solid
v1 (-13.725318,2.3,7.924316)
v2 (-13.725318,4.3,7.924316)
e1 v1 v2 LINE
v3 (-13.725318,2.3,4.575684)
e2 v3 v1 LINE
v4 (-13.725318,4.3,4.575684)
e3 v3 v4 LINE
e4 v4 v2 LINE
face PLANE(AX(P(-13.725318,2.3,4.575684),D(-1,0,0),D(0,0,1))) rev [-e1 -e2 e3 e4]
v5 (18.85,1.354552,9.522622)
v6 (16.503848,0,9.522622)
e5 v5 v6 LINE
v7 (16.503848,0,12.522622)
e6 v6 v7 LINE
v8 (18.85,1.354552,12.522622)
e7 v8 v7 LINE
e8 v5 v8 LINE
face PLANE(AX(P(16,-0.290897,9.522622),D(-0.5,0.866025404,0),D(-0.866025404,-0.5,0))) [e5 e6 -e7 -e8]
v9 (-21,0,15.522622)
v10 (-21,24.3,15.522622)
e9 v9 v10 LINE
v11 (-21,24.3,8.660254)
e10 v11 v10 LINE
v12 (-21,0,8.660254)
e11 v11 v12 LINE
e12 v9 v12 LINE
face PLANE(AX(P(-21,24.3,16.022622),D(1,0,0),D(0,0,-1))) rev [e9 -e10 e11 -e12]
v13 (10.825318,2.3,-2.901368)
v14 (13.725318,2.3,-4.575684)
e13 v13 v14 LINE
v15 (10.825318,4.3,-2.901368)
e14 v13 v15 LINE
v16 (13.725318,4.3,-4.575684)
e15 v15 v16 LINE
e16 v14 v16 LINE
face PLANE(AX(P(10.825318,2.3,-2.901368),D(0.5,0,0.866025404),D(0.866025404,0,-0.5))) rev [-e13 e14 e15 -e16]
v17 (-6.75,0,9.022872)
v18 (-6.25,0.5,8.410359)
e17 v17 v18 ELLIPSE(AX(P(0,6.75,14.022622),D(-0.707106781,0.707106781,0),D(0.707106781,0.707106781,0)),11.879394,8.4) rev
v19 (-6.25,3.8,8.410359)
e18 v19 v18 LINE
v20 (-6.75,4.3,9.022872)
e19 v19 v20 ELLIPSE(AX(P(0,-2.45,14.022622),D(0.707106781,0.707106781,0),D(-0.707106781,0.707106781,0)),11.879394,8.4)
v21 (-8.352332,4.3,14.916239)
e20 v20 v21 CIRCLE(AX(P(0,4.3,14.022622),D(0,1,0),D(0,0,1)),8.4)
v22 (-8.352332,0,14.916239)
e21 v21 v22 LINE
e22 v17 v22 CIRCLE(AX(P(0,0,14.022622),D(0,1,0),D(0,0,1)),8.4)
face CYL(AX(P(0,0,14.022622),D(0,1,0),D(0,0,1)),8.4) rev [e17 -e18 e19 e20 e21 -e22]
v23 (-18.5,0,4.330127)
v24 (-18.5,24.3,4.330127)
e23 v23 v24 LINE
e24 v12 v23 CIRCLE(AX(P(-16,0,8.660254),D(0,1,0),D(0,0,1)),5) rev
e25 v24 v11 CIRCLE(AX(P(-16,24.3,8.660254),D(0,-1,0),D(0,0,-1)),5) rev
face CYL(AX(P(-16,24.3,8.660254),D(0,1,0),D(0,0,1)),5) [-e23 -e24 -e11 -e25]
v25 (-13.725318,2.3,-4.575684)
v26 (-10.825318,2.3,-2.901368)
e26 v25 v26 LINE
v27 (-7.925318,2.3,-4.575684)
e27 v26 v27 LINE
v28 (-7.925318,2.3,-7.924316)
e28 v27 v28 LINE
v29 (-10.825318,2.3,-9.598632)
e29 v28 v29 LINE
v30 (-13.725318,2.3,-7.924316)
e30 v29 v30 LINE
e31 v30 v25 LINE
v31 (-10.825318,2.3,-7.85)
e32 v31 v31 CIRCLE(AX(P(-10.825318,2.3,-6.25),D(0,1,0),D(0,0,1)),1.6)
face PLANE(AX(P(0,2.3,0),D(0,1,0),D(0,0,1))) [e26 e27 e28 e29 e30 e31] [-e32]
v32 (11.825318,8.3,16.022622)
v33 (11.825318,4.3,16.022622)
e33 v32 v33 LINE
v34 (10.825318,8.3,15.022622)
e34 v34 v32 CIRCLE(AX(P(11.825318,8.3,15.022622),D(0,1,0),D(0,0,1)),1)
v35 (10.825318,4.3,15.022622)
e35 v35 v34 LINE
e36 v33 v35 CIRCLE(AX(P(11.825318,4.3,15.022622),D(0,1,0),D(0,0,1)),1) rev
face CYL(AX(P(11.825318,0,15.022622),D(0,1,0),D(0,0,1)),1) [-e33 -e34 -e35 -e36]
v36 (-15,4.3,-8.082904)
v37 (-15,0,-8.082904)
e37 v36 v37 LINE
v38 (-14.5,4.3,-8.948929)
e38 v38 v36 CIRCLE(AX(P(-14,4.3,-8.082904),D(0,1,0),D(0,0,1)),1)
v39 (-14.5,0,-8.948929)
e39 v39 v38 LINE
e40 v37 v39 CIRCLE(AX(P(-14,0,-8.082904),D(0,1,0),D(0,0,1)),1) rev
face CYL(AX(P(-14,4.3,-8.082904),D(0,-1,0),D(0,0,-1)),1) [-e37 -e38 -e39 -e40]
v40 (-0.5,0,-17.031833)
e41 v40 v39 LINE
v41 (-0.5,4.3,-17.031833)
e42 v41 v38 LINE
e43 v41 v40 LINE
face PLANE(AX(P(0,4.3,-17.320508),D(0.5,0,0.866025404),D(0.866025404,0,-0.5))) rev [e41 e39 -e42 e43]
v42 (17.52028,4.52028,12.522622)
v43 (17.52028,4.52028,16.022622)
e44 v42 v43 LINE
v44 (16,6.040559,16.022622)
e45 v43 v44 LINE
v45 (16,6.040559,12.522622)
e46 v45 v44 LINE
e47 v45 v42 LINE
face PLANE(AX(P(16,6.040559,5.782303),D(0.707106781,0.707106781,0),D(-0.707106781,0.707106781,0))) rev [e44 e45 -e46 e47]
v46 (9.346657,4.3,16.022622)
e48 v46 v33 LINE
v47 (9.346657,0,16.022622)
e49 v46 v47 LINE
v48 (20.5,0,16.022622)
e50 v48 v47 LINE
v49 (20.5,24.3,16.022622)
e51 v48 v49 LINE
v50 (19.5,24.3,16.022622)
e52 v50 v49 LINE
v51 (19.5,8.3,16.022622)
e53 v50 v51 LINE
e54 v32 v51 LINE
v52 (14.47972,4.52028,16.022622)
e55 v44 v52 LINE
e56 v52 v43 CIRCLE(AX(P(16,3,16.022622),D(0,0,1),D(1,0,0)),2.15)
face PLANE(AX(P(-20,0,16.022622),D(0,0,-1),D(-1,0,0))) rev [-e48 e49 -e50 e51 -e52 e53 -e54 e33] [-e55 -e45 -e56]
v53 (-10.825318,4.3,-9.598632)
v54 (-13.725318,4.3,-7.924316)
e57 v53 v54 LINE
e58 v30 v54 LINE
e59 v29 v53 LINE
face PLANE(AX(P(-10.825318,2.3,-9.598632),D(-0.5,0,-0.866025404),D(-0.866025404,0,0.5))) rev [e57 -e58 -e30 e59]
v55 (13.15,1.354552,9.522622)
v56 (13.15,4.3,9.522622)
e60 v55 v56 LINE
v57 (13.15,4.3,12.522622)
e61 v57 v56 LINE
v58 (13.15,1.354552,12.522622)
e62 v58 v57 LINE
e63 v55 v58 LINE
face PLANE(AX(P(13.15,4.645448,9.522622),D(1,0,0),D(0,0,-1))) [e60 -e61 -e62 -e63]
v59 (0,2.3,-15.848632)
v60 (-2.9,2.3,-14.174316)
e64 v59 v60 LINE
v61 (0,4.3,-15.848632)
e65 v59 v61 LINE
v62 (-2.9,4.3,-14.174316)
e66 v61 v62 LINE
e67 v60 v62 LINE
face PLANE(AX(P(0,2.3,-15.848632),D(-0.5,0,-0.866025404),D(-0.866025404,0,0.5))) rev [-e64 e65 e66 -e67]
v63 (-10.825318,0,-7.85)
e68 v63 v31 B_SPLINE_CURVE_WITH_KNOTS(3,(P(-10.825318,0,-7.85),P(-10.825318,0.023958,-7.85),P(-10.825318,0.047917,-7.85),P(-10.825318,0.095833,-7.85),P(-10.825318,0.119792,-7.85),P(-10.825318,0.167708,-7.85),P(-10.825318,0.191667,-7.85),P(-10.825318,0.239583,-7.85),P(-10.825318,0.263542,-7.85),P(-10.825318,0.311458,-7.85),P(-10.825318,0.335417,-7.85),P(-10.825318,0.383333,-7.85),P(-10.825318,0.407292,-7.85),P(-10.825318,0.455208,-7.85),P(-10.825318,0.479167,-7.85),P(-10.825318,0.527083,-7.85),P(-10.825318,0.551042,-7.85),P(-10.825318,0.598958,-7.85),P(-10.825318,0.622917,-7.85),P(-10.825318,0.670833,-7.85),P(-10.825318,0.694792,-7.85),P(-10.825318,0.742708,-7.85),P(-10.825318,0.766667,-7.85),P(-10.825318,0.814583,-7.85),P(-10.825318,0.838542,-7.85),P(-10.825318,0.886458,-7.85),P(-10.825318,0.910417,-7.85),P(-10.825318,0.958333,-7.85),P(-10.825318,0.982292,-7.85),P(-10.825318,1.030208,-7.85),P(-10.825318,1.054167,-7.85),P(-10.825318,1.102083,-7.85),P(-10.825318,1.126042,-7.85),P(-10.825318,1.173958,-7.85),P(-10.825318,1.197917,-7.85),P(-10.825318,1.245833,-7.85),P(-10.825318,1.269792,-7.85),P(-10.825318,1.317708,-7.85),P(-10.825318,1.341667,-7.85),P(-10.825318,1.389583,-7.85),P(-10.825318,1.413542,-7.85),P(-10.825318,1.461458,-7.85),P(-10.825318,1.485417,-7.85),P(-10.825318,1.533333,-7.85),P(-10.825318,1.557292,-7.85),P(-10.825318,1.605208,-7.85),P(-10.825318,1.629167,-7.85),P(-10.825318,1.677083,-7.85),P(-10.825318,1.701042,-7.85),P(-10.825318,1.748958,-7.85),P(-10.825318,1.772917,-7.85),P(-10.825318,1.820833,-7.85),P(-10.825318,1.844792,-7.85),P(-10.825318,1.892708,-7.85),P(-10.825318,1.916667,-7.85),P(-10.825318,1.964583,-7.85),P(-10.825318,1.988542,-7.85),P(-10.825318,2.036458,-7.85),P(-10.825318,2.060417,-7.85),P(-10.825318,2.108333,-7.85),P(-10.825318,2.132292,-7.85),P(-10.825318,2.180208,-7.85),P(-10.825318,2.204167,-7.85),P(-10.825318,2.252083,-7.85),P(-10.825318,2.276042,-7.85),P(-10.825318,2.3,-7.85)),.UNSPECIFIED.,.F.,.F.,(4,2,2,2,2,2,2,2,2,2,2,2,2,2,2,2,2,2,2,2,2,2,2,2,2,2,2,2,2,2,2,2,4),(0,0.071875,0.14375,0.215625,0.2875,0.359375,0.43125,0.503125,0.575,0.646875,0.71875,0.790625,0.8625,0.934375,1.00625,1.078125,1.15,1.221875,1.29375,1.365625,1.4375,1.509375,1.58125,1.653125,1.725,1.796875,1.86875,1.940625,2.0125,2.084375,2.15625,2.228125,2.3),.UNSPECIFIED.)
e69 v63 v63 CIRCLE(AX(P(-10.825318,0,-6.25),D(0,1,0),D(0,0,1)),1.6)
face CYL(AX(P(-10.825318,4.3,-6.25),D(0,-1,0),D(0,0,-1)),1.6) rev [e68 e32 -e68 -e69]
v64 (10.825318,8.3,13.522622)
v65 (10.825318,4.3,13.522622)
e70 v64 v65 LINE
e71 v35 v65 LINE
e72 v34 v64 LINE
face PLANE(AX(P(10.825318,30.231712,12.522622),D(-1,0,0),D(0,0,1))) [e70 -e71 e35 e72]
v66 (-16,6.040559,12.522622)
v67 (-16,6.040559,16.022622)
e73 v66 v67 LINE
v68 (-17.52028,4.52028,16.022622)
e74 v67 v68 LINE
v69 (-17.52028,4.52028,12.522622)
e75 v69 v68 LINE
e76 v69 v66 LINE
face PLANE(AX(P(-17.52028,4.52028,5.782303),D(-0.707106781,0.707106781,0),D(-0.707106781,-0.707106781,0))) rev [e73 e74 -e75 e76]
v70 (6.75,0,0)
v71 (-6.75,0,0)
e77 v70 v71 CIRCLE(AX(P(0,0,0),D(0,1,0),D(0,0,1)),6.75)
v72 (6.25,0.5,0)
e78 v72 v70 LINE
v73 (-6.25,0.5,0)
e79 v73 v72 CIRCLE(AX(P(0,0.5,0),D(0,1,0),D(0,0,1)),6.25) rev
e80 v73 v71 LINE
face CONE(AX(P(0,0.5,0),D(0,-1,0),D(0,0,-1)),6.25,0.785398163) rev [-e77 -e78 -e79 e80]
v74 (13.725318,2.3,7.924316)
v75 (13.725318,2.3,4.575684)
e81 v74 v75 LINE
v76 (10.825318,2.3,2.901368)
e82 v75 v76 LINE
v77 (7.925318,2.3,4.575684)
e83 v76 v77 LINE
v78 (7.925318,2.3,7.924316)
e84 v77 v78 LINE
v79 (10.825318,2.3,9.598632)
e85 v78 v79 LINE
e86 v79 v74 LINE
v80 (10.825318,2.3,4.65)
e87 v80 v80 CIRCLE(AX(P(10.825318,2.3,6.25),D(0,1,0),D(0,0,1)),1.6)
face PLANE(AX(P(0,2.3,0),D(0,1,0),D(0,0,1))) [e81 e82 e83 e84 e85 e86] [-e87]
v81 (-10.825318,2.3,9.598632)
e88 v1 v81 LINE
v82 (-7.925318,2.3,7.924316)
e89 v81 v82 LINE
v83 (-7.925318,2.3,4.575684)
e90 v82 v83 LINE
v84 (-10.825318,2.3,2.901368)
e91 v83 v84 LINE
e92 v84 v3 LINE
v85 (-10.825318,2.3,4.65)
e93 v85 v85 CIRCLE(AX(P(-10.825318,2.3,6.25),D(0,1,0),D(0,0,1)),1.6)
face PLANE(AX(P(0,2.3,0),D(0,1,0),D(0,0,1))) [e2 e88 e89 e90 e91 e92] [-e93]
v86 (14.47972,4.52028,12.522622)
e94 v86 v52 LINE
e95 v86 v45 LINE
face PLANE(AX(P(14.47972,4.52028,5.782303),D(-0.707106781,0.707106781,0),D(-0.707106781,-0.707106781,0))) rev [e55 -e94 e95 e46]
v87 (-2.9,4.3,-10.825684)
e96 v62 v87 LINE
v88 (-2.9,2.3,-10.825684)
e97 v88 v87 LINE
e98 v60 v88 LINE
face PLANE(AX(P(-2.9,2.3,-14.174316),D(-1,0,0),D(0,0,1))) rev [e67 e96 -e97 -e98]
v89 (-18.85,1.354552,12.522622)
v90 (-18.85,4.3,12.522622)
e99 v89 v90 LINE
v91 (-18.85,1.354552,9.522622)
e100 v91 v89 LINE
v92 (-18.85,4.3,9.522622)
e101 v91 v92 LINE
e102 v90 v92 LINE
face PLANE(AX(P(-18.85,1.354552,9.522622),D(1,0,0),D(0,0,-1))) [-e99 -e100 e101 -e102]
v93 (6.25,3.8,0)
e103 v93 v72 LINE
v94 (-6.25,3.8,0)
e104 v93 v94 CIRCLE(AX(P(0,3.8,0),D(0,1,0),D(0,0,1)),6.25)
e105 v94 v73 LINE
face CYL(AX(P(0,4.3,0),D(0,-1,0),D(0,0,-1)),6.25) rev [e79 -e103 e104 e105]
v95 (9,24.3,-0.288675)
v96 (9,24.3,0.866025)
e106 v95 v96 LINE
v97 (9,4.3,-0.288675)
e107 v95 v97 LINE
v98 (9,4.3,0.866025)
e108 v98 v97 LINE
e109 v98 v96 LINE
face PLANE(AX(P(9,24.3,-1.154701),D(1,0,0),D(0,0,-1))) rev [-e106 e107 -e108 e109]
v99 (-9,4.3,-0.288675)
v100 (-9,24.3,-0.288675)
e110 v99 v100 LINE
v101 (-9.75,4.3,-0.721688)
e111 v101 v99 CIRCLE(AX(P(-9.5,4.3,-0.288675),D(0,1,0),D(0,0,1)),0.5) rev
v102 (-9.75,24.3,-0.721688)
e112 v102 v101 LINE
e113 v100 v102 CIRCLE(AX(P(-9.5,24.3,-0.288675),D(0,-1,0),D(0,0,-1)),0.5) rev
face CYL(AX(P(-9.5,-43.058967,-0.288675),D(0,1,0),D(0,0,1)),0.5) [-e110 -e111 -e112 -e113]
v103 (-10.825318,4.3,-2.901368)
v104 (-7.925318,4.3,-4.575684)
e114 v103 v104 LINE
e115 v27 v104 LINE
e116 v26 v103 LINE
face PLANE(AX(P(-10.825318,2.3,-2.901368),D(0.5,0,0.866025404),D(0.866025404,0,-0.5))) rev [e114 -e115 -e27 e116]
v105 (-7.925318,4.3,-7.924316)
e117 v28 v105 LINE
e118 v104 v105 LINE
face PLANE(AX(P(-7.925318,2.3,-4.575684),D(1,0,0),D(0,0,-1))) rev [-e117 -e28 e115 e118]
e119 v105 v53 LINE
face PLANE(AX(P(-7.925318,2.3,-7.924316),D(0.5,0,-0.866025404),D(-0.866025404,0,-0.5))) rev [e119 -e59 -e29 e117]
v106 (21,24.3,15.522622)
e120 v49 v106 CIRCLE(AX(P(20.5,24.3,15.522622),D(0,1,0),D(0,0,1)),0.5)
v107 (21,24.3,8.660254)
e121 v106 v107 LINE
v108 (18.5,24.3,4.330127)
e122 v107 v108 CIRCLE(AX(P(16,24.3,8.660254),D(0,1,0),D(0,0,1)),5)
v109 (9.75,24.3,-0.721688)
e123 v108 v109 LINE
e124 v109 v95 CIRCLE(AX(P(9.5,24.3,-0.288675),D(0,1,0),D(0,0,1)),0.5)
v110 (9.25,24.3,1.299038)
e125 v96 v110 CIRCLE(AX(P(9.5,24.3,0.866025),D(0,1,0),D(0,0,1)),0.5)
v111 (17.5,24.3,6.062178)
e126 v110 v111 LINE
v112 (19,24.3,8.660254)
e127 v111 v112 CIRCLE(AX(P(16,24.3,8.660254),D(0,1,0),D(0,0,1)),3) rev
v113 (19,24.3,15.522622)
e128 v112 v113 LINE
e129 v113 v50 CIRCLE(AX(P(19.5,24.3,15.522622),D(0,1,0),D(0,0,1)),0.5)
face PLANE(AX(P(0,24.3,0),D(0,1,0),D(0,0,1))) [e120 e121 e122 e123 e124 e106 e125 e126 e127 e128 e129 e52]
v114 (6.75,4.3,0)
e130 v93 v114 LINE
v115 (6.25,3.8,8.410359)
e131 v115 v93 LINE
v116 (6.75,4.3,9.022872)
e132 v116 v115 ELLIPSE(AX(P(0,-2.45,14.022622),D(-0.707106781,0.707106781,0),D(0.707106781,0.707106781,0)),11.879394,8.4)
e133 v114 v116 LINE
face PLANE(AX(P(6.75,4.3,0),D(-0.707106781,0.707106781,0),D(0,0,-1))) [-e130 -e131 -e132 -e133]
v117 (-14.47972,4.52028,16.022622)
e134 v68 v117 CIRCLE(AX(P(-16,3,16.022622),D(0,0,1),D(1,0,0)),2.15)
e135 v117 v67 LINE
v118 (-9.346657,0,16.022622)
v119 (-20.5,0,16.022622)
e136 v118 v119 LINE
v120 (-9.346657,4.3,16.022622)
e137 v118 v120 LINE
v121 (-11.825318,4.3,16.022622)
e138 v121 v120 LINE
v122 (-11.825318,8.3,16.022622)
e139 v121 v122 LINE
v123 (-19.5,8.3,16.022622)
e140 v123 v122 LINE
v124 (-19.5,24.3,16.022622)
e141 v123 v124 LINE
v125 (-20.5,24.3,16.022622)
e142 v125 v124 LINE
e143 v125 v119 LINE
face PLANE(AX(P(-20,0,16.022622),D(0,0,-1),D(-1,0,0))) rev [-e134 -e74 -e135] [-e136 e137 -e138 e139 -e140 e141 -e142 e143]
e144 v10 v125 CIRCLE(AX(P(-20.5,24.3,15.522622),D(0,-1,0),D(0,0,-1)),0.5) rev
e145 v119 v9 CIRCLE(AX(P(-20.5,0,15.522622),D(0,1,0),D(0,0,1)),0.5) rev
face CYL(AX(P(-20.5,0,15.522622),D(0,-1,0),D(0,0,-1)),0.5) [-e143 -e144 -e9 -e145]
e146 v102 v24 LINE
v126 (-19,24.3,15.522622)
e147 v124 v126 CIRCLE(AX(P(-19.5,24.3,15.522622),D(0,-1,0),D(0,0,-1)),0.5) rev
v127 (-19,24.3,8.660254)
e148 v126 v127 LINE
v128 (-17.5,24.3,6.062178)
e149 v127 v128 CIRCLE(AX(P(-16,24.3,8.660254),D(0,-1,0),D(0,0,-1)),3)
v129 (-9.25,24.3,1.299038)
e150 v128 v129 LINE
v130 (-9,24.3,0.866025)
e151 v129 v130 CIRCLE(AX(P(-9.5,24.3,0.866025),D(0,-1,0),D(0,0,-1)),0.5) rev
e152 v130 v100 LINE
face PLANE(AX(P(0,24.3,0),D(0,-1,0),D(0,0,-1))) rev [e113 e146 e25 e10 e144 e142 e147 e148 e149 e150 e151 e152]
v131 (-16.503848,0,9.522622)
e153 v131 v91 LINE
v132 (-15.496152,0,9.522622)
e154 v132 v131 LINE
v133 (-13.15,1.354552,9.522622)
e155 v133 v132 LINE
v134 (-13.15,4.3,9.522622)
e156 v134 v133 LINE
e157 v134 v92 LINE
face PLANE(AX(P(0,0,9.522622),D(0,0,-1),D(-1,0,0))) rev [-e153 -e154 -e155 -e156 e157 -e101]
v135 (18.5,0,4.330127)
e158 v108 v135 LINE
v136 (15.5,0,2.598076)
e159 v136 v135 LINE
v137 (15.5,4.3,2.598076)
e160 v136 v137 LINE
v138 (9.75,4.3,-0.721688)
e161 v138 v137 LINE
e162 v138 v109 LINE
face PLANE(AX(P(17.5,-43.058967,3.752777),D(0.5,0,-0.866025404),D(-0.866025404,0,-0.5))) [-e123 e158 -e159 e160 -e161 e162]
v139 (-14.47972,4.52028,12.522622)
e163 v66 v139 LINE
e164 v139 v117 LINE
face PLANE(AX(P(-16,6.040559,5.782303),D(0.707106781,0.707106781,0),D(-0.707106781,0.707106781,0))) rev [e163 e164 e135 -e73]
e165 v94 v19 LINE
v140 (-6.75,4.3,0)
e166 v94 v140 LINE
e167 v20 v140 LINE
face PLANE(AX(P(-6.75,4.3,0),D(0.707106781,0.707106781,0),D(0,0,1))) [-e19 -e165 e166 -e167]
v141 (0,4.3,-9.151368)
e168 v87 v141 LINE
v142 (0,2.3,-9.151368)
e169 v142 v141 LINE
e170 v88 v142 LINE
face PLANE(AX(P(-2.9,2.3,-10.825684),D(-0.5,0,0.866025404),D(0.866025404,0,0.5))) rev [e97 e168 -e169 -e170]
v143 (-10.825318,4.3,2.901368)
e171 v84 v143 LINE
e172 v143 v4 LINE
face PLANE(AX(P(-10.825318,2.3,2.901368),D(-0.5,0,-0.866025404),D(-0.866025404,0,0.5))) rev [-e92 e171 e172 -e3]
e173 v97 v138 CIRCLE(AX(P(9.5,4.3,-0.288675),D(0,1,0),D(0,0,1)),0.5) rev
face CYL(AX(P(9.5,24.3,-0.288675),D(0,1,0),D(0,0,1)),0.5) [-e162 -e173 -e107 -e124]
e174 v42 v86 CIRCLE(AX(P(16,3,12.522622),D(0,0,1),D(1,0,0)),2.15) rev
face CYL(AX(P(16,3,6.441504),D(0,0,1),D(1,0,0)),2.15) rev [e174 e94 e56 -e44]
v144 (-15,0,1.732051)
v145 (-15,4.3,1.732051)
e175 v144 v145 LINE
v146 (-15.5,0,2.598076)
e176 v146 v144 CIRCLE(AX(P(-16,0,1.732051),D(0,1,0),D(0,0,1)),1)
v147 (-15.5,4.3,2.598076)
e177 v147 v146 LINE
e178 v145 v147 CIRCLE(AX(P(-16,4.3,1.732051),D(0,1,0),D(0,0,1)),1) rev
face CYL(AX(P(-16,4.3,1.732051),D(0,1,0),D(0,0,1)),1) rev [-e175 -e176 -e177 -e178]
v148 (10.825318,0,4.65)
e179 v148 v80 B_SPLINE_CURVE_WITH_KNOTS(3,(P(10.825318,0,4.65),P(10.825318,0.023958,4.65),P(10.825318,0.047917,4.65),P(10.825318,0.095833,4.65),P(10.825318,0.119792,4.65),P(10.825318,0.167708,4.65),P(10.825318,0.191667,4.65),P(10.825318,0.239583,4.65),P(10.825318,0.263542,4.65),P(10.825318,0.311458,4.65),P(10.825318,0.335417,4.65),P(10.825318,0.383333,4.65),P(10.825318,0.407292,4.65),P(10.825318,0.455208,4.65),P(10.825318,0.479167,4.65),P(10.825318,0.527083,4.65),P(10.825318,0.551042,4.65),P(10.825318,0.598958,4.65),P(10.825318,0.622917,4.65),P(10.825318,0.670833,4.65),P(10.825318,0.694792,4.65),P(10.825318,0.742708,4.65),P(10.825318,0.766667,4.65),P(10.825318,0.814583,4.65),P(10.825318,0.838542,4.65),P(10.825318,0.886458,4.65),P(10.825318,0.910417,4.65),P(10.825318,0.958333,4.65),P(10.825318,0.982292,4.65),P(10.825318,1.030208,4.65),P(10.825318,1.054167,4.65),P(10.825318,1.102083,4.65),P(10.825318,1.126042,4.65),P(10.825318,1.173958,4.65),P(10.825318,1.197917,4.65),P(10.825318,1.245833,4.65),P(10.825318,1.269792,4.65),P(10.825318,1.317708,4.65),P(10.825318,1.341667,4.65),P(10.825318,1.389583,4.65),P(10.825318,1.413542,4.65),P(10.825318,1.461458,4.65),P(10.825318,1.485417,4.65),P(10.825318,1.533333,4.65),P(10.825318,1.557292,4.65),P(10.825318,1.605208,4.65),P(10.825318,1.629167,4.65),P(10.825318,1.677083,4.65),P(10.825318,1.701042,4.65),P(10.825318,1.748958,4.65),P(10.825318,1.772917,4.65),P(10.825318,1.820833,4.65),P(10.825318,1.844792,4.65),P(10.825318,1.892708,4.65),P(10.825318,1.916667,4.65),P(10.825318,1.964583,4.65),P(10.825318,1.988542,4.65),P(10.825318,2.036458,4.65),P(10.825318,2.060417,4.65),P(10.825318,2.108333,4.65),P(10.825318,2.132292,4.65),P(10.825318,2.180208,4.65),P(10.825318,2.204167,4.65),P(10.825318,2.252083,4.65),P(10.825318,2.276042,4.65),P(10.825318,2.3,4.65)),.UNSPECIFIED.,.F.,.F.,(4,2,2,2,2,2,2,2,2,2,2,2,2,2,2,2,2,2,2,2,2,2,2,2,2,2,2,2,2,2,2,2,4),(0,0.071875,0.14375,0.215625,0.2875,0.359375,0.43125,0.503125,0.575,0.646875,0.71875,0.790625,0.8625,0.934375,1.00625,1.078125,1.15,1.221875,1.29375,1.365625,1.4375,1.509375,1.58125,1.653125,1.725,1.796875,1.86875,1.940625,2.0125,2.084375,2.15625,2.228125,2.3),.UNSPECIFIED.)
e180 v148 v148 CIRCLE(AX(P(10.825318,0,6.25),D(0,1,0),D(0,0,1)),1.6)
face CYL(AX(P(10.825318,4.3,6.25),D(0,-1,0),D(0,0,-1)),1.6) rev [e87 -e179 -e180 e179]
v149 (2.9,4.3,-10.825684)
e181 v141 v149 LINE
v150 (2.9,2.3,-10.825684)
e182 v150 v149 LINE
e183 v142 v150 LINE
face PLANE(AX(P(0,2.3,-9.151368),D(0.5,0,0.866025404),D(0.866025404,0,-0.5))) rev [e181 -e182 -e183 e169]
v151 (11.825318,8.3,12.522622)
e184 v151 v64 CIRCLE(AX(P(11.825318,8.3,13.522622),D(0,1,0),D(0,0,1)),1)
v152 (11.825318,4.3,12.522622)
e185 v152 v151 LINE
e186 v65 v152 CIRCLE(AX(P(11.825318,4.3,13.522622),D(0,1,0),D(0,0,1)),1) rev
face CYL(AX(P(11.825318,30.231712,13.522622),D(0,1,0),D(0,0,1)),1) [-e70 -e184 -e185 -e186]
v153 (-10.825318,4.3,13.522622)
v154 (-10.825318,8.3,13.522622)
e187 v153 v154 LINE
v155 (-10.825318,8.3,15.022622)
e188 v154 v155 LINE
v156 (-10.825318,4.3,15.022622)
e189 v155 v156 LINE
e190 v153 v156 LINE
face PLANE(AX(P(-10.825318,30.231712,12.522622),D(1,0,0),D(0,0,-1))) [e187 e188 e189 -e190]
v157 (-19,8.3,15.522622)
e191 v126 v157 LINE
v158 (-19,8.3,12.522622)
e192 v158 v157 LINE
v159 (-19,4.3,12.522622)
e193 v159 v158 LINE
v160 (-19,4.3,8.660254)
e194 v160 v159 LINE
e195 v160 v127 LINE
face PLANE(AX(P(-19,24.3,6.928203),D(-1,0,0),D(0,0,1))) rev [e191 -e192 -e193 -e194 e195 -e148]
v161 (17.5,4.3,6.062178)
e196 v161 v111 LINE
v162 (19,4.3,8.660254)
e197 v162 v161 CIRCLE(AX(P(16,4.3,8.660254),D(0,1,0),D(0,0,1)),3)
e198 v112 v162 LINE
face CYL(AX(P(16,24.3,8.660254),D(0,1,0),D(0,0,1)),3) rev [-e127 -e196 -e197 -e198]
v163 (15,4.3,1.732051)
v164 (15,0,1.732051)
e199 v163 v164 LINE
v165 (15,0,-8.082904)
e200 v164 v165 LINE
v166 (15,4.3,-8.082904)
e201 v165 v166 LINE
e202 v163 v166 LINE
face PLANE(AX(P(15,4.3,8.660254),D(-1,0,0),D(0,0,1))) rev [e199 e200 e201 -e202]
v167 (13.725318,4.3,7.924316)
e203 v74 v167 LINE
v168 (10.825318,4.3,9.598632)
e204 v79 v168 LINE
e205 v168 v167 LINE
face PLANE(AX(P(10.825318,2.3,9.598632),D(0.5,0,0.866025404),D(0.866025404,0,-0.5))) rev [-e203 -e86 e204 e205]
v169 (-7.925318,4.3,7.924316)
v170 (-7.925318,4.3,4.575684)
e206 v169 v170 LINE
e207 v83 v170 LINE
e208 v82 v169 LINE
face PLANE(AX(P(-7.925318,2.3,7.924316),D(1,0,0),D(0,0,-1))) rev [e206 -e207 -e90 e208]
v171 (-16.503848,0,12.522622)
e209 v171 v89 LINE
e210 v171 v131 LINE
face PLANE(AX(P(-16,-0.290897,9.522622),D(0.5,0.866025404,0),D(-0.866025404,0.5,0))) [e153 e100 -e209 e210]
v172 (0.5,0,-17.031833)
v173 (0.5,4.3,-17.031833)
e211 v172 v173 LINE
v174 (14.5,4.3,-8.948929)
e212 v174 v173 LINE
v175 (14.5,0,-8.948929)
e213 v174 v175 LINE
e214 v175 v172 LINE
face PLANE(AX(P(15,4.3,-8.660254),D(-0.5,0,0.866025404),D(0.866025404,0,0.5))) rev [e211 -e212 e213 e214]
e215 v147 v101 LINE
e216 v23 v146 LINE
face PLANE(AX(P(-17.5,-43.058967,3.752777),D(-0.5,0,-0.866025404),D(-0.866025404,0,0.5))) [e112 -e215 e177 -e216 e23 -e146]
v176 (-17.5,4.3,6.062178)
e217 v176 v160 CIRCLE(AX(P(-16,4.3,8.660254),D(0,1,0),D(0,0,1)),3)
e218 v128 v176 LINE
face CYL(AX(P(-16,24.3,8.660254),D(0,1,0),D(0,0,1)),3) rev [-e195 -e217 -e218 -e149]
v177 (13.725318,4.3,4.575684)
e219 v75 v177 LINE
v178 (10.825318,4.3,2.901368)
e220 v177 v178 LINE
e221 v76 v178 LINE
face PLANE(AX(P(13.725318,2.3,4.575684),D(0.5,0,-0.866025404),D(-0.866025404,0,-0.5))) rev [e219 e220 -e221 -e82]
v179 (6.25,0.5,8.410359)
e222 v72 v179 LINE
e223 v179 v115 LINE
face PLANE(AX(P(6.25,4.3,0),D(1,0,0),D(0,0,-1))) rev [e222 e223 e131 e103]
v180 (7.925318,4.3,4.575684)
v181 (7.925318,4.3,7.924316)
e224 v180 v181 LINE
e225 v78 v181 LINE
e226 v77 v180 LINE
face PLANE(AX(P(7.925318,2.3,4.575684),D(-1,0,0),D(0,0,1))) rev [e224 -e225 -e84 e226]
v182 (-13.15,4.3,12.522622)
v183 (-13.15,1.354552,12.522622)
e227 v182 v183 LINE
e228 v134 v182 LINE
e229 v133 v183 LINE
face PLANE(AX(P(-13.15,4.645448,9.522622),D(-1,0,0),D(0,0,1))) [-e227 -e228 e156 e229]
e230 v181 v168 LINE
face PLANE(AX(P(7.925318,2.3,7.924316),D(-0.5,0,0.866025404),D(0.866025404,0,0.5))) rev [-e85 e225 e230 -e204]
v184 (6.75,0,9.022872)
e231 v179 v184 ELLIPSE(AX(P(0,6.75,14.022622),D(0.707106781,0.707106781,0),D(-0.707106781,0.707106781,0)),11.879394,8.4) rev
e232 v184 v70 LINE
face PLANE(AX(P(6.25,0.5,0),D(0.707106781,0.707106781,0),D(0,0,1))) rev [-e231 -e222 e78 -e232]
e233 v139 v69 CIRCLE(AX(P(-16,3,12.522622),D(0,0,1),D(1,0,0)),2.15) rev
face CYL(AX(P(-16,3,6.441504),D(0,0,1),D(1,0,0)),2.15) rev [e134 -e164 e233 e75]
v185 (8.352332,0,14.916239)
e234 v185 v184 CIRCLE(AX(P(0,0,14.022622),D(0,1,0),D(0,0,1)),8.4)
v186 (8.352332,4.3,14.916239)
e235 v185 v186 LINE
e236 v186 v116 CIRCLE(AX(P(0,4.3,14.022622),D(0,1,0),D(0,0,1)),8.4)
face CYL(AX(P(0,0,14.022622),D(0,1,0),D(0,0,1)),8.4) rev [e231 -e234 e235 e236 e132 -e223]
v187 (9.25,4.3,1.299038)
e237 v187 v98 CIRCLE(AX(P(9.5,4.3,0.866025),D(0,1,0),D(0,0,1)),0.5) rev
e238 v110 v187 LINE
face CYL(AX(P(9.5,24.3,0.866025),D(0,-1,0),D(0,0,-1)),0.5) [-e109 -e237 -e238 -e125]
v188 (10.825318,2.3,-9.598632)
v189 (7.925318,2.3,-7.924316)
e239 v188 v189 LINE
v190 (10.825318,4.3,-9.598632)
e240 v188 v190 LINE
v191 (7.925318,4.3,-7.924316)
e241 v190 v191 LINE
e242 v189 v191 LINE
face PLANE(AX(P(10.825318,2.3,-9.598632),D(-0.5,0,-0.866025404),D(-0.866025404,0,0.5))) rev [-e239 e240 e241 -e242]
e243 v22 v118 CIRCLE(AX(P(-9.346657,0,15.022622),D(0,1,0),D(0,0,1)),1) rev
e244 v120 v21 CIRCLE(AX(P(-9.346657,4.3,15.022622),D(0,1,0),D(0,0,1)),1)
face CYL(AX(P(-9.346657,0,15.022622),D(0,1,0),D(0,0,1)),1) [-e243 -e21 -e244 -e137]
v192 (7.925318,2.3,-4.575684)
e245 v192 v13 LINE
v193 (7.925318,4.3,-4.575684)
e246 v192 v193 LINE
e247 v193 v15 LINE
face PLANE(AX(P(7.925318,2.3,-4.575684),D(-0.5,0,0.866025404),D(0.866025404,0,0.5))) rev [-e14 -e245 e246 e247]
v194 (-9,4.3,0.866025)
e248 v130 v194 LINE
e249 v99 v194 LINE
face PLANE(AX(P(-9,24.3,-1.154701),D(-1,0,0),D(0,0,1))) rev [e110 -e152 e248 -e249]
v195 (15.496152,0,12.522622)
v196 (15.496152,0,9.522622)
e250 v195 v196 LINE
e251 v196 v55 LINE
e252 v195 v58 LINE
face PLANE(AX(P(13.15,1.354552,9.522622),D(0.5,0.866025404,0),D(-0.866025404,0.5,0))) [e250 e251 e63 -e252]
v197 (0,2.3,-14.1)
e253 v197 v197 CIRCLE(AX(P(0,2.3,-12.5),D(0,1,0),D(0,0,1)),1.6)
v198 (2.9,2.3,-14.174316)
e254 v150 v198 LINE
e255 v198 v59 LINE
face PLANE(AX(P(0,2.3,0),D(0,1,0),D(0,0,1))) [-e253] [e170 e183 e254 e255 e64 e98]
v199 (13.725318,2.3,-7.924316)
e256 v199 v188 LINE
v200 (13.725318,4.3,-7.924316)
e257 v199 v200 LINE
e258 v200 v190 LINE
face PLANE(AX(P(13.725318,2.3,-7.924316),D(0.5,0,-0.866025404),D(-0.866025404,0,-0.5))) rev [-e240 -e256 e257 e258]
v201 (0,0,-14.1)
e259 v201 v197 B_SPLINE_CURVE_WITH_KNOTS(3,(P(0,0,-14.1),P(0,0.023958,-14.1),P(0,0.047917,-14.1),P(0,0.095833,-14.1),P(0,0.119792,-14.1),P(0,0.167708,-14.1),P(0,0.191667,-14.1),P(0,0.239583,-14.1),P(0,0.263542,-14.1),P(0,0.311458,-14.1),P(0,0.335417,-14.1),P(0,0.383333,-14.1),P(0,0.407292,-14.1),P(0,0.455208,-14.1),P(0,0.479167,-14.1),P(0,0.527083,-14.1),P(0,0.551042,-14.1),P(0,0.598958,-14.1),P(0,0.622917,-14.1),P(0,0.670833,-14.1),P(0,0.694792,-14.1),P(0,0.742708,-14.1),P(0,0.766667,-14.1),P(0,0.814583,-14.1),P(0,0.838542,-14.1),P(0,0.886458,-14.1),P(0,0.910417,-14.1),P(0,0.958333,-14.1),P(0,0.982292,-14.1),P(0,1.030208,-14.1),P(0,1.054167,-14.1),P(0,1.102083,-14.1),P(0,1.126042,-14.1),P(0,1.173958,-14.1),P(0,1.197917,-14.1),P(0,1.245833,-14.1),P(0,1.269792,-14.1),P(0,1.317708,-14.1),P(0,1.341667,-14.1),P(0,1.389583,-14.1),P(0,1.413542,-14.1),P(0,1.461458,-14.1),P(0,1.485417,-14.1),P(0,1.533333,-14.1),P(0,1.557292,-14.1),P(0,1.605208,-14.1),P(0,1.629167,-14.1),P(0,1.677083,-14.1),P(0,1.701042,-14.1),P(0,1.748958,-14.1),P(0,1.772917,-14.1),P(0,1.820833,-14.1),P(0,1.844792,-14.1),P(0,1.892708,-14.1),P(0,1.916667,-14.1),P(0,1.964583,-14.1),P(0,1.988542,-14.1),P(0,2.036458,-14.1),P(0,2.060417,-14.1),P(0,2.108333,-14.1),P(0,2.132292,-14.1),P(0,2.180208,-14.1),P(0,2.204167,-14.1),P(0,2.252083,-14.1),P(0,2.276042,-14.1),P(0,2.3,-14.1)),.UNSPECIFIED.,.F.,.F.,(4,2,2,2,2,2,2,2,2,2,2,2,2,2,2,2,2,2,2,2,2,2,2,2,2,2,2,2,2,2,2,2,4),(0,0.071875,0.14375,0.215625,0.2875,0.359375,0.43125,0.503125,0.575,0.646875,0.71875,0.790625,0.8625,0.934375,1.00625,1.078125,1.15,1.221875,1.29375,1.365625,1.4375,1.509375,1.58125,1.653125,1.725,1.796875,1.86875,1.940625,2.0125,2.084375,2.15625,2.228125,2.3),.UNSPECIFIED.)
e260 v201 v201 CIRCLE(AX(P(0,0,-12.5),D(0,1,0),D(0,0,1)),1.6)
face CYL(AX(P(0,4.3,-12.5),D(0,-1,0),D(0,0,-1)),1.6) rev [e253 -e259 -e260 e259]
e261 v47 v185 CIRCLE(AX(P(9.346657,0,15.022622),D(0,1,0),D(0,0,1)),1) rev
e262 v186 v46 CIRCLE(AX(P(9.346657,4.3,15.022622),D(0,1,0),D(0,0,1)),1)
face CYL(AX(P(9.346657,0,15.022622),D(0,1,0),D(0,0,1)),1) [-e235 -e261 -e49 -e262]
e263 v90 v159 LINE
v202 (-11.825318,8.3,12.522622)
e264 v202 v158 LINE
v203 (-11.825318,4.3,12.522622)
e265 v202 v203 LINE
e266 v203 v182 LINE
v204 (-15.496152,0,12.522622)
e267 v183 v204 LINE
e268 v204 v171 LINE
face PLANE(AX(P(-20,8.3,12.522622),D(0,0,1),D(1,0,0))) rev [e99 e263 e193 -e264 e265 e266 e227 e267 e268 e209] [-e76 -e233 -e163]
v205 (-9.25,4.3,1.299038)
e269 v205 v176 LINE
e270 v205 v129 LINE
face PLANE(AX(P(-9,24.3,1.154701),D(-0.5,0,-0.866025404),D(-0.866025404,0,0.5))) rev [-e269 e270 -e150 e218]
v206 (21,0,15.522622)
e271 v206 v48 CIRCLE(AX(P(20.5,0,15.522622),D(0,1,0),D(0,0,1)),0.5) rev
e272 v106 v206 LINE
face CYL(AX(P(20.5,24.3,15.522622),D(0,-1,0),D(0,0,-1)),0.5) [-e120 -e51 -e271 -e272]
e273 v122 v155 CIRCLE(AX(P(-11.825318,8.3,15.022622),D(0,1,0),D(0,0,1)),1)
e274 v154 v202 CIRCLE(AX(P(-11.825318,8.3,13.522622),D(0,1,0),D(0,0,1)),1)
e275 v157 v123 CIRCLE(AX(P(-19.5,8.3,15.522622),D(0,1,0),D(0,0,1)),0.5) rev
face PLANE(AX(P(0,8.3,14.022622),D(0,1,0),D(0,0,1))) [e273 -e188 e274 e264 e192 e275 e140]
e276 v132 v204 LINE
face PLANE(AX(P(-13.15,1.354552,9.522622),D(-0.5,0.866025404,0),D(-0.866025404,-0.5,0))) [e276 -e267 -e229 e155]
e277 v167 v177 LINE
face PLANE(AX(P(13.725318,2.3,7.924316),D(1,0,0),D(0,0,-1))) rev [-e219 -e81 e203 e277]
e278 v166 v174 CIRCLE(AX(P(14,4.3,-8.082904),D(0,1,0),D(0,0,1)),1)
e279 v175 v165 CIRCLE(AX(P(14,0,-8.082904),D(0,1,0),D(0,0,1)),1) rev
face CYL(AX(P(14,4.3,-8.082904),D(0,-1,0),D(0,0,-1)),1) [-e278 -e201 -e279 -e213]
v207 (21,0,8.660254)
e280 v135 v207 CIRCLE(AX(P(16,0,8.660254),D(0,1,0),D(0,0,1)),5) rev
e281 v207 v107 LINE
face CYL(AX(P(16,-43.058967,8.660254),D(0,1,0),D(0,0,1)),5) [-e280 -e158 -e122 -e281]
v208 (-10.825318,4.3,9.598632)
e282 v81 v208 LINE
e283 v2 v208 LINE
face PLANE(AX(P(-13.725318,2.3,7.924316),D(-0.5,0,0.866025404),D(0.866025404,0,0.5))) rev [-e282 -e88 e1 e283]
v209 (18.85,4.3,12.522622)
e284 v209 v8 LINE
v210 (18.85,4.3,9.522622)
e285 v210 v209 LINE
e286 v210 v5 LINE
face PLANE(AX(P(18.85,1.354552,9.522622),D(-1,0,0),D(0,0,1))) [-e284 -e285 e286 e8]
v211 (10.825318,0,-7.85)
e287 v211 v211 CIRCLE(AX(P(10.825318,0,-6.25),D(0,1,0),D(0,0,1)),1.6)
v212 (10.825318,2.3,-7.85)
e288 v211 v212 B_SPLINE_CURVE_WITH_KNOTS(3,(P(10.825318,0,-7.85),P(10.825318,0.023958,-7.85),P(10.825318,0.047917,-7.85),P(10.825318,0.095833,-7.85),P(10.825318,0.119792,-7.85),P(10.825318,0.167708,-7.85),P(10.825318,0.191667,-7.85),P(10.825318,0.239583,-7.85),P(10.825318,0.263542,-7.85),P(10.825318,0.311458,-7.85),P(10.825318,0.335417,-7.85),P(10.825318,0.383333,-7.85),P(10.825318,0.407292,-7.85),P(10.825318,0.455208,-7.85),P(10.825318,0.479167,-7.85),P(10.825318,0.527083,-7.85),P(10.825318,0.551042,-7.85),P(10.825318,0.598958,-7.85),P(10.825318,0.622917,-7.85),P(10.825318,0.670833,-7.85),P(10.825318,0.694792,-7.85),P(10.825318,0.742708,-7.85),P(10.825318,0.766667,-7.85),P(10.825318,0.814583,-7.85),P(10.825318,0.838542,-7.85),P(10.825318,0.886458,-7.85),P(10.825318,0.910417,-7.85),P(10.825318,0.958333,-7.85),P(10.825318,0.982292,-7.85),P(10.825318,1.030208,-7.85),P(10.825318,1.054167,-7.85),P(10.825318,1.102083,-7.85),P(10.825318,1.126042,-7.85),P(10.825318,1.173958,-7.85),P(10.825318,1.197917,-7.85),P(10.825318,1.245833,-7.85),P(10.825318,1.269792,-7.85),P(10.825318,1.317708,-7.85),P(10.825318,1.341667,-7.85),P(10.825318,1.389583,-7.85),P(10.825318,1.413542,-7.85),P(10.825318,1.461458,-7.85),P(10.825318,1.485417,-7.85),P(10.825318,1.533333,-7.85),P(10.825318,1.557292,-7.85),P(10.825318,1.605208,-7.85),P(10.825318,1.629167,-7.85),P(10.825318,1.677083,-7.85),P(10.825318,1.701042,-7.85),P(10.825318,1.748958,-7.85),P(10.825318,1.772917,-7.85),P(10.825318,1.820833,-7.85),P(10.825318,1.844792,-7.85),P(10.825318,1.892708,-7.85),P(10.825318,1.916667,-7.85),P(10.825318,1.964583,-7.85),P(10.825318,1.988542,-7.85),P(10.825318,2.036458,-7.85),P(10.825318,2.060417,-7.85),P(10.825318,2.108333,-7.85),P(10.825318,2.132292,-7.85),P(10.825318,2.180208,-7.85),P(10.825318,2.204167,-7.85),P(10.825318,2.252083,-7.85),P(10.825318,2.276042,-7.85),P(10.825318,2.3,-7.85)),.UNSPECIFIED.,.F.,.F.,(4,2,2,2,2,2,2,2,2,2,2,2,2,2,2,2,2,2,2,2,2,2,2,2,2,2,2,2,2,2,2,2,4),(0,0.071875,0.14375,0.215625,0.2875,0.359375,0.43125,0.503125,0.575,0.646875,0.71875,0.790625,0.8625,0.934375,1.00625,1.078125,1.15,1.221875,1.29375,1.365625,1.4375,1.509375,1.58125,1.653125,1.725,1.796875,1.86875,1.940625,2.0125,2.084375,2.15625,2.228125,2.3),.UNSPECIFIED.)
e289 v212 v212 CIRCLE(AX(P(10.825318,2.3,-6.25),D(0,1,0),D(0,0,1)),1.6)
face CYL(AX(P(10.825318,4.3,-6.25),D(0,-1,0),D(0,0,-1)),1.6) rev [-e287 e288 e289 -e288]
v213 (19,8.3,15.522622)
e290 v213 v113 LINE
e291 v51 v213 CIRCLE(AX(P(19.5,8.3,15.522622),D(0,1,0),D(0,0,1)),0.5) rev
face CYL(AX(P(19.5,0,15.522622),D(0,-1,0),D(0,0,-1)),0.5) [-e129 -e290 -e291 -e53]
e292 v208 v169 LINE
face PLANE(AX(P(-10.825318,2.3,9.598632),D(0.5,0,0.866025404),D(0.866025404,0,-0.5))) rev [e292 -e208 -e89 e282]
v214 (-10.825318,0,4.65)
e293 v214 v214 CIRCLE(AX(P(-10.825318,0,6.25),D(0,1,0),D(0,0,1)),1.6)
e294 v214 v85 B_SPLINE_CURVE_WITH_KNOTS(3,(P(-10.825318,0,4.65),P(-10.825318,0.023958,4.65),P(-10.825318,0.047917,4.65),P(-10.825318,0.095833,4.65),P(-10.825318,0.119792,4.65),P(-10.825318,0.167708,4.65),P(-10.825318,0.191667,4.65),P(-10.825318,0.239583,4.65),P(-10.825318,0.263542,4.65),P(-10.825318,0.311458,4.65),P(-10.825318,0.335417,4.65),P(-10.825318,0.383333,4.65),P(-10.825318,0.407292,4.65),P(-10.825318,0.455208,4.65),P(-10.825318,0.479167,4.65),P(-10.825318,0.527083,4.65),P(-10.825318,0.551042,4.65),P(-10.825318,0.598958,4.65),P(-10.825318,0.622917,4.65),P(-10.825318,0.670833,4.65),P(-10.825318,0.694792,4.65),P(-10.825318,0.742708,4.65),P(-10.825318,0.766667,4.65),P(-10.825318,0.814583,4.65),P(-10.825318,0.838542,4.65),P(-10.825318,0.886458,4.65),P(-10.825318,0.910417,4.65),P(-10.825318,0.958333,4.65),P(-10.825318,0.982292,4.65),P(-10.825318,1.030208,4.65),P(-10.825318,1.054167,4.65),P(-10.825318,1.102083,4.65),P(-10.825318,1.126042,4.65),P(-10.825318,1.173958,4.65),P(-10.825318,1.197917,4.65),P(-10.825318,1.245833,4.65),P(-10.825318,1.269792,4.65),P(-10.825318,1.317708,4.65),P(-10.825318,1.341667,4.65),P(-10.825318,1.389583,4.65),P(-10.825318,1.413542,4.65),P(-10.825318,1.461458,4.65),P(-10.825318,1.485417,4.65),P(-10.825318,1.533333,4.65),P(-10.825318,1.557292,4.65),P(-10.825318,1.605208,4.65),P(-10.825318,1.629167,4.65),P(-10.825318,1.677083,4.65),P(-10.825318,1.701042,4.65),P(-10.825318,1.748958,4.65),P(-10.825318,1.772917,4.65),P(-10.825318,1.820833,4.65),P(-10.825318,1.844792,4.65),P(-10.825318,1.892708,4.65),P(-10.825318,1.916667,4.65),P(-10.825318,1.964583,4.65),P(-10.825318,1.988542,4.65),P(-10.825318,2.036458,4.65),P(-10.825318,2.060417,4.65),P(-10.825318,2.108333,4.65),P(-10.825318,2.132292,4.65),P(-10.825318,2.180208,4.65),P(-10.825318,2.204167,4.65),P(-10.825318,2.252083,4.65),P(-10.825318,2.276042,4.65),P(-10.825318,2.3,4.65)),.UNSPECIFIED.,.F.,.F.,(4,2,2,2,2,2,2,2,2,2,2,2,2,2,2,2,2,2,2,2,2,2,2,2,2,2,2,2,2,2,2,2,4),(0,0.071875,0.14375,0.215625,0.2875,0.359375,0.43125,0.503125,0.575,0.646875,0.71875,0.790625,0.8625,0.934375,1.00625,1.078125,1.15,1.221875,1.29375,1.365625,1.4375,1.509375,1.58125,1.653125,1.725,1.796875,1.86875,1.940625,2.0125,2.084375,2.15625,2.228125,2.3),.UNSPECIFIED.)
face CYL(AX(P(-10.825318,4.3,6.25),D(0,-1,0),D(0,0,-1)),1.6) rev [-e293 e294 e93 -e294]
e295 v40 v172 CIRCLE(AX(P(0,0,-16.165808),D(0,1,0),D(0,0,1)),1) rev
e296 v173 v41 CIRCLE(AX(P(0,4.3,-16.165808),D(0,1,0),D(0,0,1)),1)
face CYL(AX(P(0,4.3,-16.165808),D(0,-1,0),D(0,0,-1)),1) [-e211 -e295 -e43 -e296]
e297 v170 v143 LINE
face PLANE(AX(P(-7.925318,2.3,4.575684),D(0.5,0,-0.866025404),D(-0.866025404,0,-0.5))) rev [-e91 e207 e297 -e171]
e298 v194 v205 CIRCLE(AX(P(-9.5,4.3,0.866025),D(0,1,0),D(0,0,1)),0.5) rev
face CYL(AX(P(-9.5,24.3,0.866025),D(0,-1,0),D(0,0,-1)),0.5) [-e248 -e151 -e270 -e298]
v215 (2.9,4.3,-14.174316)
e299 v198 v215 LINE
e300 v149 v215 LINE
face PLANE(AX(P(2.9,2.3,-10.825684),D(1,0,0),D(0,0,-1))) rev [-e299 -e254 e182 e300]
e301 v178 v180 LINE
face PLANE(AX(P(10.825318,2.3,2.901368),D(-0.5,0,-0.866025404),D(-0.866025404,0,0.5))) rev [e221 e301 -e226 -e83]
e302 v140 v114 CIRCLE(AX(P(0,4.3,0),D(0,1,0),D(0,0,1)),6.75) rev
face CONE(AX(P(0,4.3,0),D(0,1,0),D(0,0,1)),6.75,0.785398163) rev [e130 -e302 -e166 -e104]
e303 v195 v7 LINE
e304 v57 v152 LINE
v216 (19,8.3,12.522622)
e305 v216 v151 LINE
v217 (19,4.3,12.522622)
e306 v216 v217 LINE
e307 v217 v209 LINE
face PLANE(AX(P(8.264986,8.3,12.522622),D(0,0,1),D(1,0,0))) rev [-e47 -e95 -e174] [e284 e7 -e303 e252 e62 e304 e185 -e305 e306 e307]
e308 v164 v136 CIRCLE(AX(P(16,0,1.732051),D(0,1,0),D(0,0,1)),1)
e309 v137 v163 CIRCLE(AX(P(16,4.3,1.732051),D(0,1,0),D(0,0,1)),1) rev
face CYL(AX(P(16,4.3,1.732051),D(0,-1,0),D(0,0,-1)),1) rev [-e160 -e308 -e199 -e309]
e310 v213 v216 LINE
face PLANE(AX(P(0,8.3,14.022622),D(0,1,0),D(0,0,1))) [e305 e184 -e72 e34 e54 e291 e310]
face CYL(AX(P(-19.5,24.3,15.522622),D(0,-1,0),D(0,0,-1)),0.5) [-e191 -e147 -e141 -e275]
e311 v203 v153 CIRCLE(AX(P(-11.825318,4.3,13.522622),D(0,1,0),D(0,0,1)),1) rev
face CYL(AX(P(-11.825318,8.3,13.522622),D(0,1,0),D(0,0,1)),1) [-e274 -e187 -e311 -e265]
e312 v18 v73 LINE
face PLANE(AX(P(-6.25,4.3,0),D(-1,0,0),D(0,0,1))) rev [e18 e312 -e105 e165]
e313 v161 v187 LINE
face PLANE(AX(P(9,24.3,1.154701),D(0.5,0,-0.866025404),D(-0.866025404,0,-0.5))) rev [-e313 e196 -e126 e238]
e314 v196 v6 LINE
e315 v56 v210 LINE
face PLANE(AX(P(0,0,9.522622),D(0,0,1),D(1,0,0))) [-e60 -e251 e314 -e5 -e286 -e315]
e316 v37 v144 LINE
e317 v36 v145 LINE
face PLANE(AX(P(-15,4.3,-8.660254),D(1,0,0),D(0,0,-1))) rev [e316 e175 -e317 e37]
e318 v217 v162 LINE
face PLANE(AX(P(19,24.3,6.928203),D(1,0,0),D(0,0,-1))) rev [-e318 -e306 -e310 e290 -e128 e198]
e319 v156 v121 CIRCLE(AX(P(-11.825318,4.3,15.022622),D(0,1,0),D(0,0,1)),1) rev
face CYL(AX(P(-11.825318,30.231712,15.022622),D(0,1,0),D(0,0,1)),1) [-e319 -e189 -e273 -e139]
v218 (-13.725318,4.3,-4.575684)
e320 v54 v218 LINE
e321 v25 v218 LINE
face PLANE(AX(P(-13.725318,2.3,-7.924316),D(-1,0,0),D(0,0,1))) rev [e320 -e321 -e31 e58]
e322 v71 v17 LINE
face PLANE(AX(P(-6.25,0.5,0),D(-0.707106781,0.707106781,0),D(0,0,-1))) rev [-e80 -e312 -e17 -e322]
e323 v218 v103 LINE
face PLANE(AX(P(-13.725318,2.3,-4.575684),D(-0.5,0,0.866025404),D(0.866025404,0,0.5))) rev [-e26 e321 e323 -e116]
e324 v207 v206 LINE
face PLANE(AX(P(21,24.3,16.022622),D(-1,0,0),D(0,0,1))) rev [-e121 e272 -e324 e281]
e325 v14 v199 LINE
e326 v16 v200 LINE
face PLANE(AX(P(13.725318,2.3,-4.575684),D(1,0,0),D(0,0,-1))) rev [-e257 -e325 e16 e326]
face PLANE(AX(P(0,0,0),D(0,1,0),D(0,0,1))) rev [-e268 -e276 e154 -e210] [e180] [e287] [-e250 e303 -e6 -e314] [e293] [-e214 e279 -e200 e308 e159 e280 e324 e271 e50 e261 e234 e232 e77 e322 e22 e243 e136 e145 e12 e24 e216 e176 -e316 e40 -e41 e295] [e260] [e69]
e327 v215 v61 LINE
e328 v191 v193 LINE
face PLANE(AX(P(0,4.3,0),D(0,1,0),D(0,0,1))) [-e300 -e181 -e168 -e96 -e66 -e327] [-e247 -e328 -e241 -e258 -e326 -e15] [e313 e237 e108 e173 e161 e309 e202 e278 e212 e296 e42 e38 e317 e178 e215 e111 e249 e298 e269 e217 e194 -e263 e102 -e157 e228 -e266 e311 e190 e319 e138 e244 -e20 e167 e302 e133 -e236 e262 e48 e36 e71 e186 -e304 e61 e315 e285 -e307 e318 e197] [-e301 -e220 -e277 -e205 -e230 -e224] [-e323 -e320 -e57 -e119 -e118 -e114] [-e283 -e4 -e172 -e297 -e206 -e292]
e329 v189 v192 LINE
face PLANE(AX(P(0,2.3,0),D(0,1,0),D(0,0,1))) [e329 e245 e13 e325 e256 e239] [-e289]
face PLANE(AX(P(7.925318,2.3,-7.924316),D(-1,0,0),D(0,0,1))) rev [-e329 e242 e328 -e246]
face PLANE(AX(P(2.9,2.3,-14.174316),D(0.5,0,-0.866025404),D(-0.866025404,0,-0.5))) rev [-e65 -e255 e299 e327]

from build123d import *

# Parameters (mm, degrees)
SKETCH1_R                       = 1.6
BOSS_EXTRUDE1_DEPTH             = 4.3
FILLET1_R                       = 1
CUT_EXTRUDE1_DEPTH              = 2
BOSS_EXTRUDE2_DEPTH             = 4.3
SKETCH4_R                       = 8.4
CUT_EXTRUDE2_DEPTH              = 32.552755501
SKETCH5_W                       = 40
SKETCH5_H                       = 8
CUT_EXTRUDE3_DEPTH              = 32.552755501
MOVE_FACE1_DEPTH                = 4.3
BOSS_EXTRUDE3_START             = 4
BOSS_EXTRUDE3_DEPTH             = 4
SKETCH7_R                       = 2.15
CUT_EXTRUDE4_DEPTH              = 3.5
CUT_EXTRUDE5_DEPTH              = 3
SKETCH9_W                       = 21.650635094
SKETCH9_H                       = 3.5
CUT_EXTRUDE6_DEPTH              = 4
FILLET2_R                       = 1
CHAMFER1_SIZE                   = 0.5
CUT_EXTRUDE7_DEPTH              = 3.5
BOSS_EXTRUDE4_REACH             = 28.705
BOSS_EXTRUDE4_DIRECTION_2_DEPTH = 20
FILLET3_R                       = 3
FILLET4_R                       = 5
FILLET5_R                       = 0.5


# Read off the part's stored shape, not the designer's step: Move Face1
with BuildPart() as part:
    # Sketch1 → Boss-Extrude1 (new body)
    with BuildSketch(Plane(origin=(0, 0, 0), x_dir=(1, 0, 0), z_dir=(0, 1, 0))):
        with BuildLine():
            Line((0, 17.320508076), (-15, 8.660254038))
            Line((-15, 8.660254038), (-15, -8.660254038))
            Line((-15, -8.660254038), (-6.25, -13.712068893))
            Line((-6.25, -13.712068893), (-6.25, 0))
            ThreePointArc((-6.25, 0), (0, 6.25), (6.25, 0))
            Line((6.25, 0), (6.25, -13.712068893))
            Line((6.25, -13.712068893), (15, -8.660254038))
            Line((15, -8.660254038), (15, 8.660254038))
            Line((15, 8.660254038), (0, 17.320508076))
        make_face()
        with Locations(Location((0, 12.5, 0), (0, 0, 90))):
            Circle(SKETCH1_R, mode=Mode.SUBTRACT)
        with Locations(Location((10.825317547, 6.25, 0), (0, 0, 90))):
            Circle(SKETCH1_R, mode=Mode.SUBTRACT)
        with Locations(Location((10.825317547, -6.25, 0), (0, 0, 90))):
            Circle(SKETCH1_R, mode=Mode.SUBTRACT)
        with Locations(Location((-10.825317547, -6.25, 0), (0, 0, 90))):
            Circle(SKETCH1_R, mode=Mode.SUBTRACT)
        with Locations(Location((-10.825317547, 6.25, 0), (0, 0, 90))):
            Circle(SKETCH1_R, mode=Mode.SUBTRACT)
    extrude(amount=BOSS_EXTRUDE1_DEPTH)

    # Fillet1
    fillet1_edges = [part.edges().sort_by_distance(p)[0] for p in [
        (15, 2.15, -8.660254038),
        (15, 2.15, 8.660254038),
        (6.25, 2.15, 13.712068893),
        (-6.25, 2.15, 13.712068893),
        (-15, 2.15, 8.660254038),
        (-15, 2.15, -8.660254038),
        (0, 2.15, -17.320508076),
    ]]
    fillet(fillet1_edges, radius=FILLET1_R)

    # Sketch2 → Cut-Extrude1 (cut)
    with BuildSketch(Plane(origin=(0, 4.3, 0), x_dir=(1, 0, 0), z_dir=(0, 1, 0))):
        Polygon((0, 15.848631561), (-2.9, 14.174315781), (-2.9, 10.825684219), (0, 9.151368439), (2.9, 10.825684219), (2.9, 14.174315781), align=None)
        Polygon((13.725317547, 4.575684219), (13.725317547, 7.924315781), (10.825317547, 9.598631561), (7.925317547, 7.924315781), (7.925317547, 4.575684219), (10.825317547, 2.901368439), align=None)
        Polygon((13.725317547, -4.575684219), (10.825317547, -2.901368439), (7.925317547, -4.575684219), (7.925317547, -7.924315781), (10.825317547, -9.598631561), (13.725317547, -7.924315781), align=None)
        Polygon((-13.725317547, -4.575684219), (-13.725317547, -7.924315781), (-10.825317547, -9.598631561), (-7.925317547, -7.924315781), (-7.925317547, -4.575684219), (-10.825317547, -2.901368439), align=None)
        Polygon((-13.725317547, 7.924315781), (-13.725317547, 4.575684219), (-10.825317547, 2.901368439), (-7.925317547, 4.575684219), (-7.925317547, 7.924315781), (-10.825317547, 9.598631561), align=None)
    extrude(amount=-CUT_EXTRUDE1_DEPTH, mode=Mode.SUBTRACT)

    # Sketch3 → Boss-Extrude2 (add)
    with BuildSketch(Plane(origin=(0, 4.3, 0), x_dir=(1, 0, 0), z_dir=(0, 1, 0))):
        with BuildLine():
            Line((-15, -8.082903769), (-6.25, -11.980018086))
            Line((-6.25, -11.980018086), (6.25, -11.980018086))
            Line((6.25, -11.980018086), (15, -8.082903769))
            Line((15, -8.082903769), (20, -10.969655115))
            Line((20, -10.969655115), (20, -22.376680266))
            ThreePointArc((20, -22.376680266), (19.517914755, -23.540537003), (18.354058018, -24.022622248))
            Line((18.354058018, -24.022622248), (-18.354058018, -24.022622248))
            ThreePointArc((-18.354058018, -24.022622248), (-19.517914755, -23.540537003), (-20, -22.376680266))
            Line((-20, -22.376680266), (-20, -10.969655115))
            Line((-20, -10.969655115), (-15, -8.082903769))
        make_face()
    extrude(amount=-BOSS_EXTRUDE2_DEPTH)

    # Sketch4 → Cut-Extrude2 (cut, through all)
    with BuildSketch(Plane(origin=(0, 4.3, 0), x_dir=(1, 0, 0), z_dir=(0, 1, 0))):
        with Locations((0, -14.022622248)):
            Circle(SKETCH4_R)
    extrude(amount=-CUT_EXTRUDE2_DEPTH, mode=Mode.SUBTRACT)

    # Sketch5 → Cut-Extrude3 (cut, through all)
    with BuildSketch(Plane(origin=(0, 4.3, 0), x_dir=(1, 0, 0), z_dir=(0, 1, 0))):
        with Locations((0, -20.022622248)):
            Rectangle(SKETCH5_W, SKETCH5_H)
    extrude(amount=-CUT_EXTRUDE3_DEPTH, mode=Mode.SUBTRACT)

    # Move Face1 outline → Move Face1 (add)
    with BuildSketch(Plane(origin=(0, 0, 0), x_dir=(1, 0, 0), z_dir=(0, 1, 0))):
        Polygon((20, -10.969655115), (20, -5.196152423), (15, -2.309401077), (15, -8.082903769), align=None)
        Polygon((-15, -2.309401077), (-20, -5.196152423), (-20, -10.969655115), (-15, -8.082903769), align=None)
    extrude(amount=MOVE_FACE1_DEPTH)

    # Sketch6 → Boss-Extrude3 (add)
    with BuildSketch(Plane(origin=(0, 4.3, 0), x_dir=(1, 0, 0), z_dir=(0, 1, 0)).offset(BOSS_EXTRUDE3_START)):
        with BuildLine():
            Line((-20, -12.522622248), (-8.264986388, -12.522622248))
            ThreePointArc((-8.264986388, -12.522622248), (-8.396109903, -14.278236217), (-8.158431222, -16.022622248))
            Line((-8.158431222, -16.022622248), (-20, -16.022622248))
            Line((-20, -16.022622248), (-20, -12.522622248))
        make_face()
        with BuildLine():
            Line((8.264986388, -12.522622248), (20, -12.522622248))
            Line((20, -12.522622248), (20, -16.022622248))
            Line((20, -16.022622248), (8.158431222, -16.022622248))
            ThreePointArc((8.158431222, -16.022622248), (8.396109903, -14.278236217), (8.264986388, -12.522622248))
        make_face()
    extrude(amount=-BOSS_EXTRUDE3_DEPTH)

    # Sketch7 → Cut-Extrude4 (cut)
    with BuildSketch(Plane.XY.offset(16.022622248)):
        with Locations((-16, 3)):
            Circle(SKETCH7_R)
        with Locations((16, 3)):
            Circle(SKETCH7_R)
    extrude(amount=-CUT_EXTRUDE4_DEPTH, mode=Mode.SUBTRACT)

    # Sketch8 → Cut-Extrude5 (cut)
    with BuildSketch(Plane(origin=(0, 0, 12.522622248), x_dir=(-1, 0, 0), z_dir=(0, 0, -1))):
        Polygon((16, 6.290896534), (13.15, 4.645448267), (13.15, 1.354551733), (16, -0.290896534), (18.85, 1.354551733), (18.85, 4.645448267), align=None)
        Polygon((-18.85, 4.645448267), (-16, 6.290896534), (-13.15, 4.645448267), (-13.15, 1.354551733), (-16, -0.290896534), (-18.85, 1.354551733), align=None)
    extrude(amount=CUT_EXTRUDE5_DEPTH, mode=Mode.SUBTRACT)

    # Sketch9 → Cut-Extrude6 (cut)
    with BuildSketch(Plane(origin=(0, 4.3, 0), x_dir=(1, 0, 0), z_dir=(0, 1, 0))):
        with Locations((0, -14.272622248)):
            Rectangle(SKETCH9_W, SKETCH9_H)
    extrude(amount=CUT_EXTRUDE6_DEPTH, mode=Mode.SUBTRACT)

    # Fillet2
    fillet2_edges = [part.edges().sort_by_distance(p)[0] for p in [
        (20, 2.15, 5.196152423),
        (-20, 2.15, 5.196152423),
        (8.158431222, 2.15, 16.022622248),
        (20, 6.3, 12.522622248),
        (-20, 6.3, 12.522622248),
        (-8.158431222, 2.15, 16.022622248),
        (-10.825317547, 6.3, 16.022622248),
        (10.825317547, 6.3, 12.522622248),
        (-10.825317547, 6.3, 12.522622248),
        (10.825317547, 6.3, 16.022622248),
        (15, 2.15, 2.309401077),
        (-15, 2.15, 2.309401077),
    ]]
    fillet(fillet2_edges, radius=FILLET2_R)

    # Chamfer1
    chamfer1_edges = [part.edges().sort_by_distance(p)[0] for p in [
        (0, 4.3, -6.25),
        (6.25, 4.3, 4.205179445),
        (-6.25, 4.3, 4.205179445),
        (-6.25, 0, 4.205179445),
        (6.25, 0, 4.205179445),
        (0, 0, -6.25),
    ]]
    chamfer(chamfer1_edges, length=CHAMFER1_SIZE)

    # Sketch10 → Cut-Extrude7 (cut)
    with BuildSketch(Plane.XY.offset(16.022622248)):
        with BuildLine():
            Line((-17.52027958, 4.52027958), (-16, 6.040559159))
            Line((-16, 6.040559159), (-14.47972042, 4.52027958))
            ThreePointArc((-14.47972042, 4.52027958), (-16, 0.85), (-17.52027958, 4.52027958))
        make_face()
        with BuildLine():
            Line((14.47972042, 4.52027958), (16, 6.040559159))
            Line((16, 6.040559159), (17.52027958, 4.52027958))
            ThreePointArc((17.52027958, 4.52027958), (16, 0.85), (14.47972042, 4.52027958))
        make_face()
    extrude(amount=-CUT_EXTRUDE7_DEPTH, mode=Mode.SUBTRACT)

    # Boss-Extrude4: up to this face of the body (flat: up to its plane)
    boss_extrude4_end = Plane(part.part.faces().sort_by_distance((-8.607291251, 0, 11.682408659))[0])
    # Sketch11 → Boss-Extrude4 (add, up to the picked face)
    with BuildSketch(Plane(origin=(0, 4.3, 0), x_dir=(1, 0, 0), z_dir=(0, 1, 0)), mode=Mode.PRIVATE) as boss_extrude4_sk1:
        Polygon((9, -1.154700538), (19, -6.92820323), (19, -16.022622248), (21, -16.022622248), (21, -5.773502692), (9, 1.154700538), align=None)
    boss_extrude4_tool1 = split(extrude(boss_extrude4_sk1.sketch, amount=-BOSS_EXTRUDE4_REACH, mode=Mode.PRIVATE), bisect_by=boss_extrude4_end, keep=Keep.BOTH, mode=Mode.PRIVATE)
    # Sketch11 → Boss-Extrude4 (add, up to the picked face)
    with BuildSketch(Plane(origin=(0, 4.3, 0), x_dir=(1, 0, 0), z_dir=(0, 1, 0)), mode=Mode.PRIVATE) as boss_extrude4_sk2:
        Polygon((-9, 1.154700538), (-9, -1.154700538), (-19, -6.92820323), (-19, -16.022622248), (-21, -16.022622248), (-21, -5.773502692), align=None)
    boss_extrude4_tool2 = split(extrude(boss_extrude4_sk2.sketch, amount=-BOSS_EXTRUDE4_REACH, mode=Mode.PRIVATE), bisect_by=boss_extrude4_end, keep=Keep.BOTH, mode=Mode.PRIVATE)
    add(boss_extrude4_tool1.solids().sort_by(Axis((14.104769, 4.3, 3.859987), (0, -1, 0)))[0])
    add(boss_extrude4_tool2.solids().sort_by(Axis((-9.209538, 4.3, 0), (0, -1, 0)))[0])

    # Sketch11 → Boss-Extrude4 direction 2 (add)
    with BuildSketch(Plane(origin=(0, 4.3, 0), x_dir=(1, 0, 0), z_dir=(0, 1, 0))):
        Polygon((9, -1.154700538), (19, -6.92820323), (19, -16.022622248), (21, -16.022622248), (21, -5.773502692), (9, 1.154700538), align=None)
        Polygon((-9, 1.154700538), (-9, -1.154700538), (-19, -6.92820323), (-19, -16.022622248), (-21, -16.022622248), (-21, -5.773502692), align=None)
    extrude(amount=BOSS_EXTRUDE4_DIRECTION_2_DEPTH)

    # Fillet3
    fillet3_edges = [part.edges().sort_by_distance(p)[0] for p in [
        (19, 14.3, 6.92820323),
        (-19, 14.3, 6.92820323),
    ]]
    fillet(fillet3_edges, radius=FILLET3_R)

    # Fillet4
    fillet4_edges = [part.edges().sort_by_distance(p)[0] for p in [
        (21, 12.15, 5.773502692),
        (-21, 12.15, 5.773502692),
    ]]
    fillet(fillet4_edges, radius=FILLET4_R)

    # Fillet5
    fillet5_edges = [part.edges().sort_by_distance(p)[0] for p in [
        (9, 14.3, -1.154700538),
        (9, 14.3, 1.154700538),
        (19, 16.3, 16.022622248),
        (21, 12.15, 16.022622248),
        (-9, 14.3, -1.154700538),
        (-21, 12.15, 16.022622248),
        (-19, 16.3, 16.022622248),
        (-9, 14.3, 1.154700538),
    ]]
    fillet(fillet5_edges, radius=FILLET5_R)


solid = part.part
